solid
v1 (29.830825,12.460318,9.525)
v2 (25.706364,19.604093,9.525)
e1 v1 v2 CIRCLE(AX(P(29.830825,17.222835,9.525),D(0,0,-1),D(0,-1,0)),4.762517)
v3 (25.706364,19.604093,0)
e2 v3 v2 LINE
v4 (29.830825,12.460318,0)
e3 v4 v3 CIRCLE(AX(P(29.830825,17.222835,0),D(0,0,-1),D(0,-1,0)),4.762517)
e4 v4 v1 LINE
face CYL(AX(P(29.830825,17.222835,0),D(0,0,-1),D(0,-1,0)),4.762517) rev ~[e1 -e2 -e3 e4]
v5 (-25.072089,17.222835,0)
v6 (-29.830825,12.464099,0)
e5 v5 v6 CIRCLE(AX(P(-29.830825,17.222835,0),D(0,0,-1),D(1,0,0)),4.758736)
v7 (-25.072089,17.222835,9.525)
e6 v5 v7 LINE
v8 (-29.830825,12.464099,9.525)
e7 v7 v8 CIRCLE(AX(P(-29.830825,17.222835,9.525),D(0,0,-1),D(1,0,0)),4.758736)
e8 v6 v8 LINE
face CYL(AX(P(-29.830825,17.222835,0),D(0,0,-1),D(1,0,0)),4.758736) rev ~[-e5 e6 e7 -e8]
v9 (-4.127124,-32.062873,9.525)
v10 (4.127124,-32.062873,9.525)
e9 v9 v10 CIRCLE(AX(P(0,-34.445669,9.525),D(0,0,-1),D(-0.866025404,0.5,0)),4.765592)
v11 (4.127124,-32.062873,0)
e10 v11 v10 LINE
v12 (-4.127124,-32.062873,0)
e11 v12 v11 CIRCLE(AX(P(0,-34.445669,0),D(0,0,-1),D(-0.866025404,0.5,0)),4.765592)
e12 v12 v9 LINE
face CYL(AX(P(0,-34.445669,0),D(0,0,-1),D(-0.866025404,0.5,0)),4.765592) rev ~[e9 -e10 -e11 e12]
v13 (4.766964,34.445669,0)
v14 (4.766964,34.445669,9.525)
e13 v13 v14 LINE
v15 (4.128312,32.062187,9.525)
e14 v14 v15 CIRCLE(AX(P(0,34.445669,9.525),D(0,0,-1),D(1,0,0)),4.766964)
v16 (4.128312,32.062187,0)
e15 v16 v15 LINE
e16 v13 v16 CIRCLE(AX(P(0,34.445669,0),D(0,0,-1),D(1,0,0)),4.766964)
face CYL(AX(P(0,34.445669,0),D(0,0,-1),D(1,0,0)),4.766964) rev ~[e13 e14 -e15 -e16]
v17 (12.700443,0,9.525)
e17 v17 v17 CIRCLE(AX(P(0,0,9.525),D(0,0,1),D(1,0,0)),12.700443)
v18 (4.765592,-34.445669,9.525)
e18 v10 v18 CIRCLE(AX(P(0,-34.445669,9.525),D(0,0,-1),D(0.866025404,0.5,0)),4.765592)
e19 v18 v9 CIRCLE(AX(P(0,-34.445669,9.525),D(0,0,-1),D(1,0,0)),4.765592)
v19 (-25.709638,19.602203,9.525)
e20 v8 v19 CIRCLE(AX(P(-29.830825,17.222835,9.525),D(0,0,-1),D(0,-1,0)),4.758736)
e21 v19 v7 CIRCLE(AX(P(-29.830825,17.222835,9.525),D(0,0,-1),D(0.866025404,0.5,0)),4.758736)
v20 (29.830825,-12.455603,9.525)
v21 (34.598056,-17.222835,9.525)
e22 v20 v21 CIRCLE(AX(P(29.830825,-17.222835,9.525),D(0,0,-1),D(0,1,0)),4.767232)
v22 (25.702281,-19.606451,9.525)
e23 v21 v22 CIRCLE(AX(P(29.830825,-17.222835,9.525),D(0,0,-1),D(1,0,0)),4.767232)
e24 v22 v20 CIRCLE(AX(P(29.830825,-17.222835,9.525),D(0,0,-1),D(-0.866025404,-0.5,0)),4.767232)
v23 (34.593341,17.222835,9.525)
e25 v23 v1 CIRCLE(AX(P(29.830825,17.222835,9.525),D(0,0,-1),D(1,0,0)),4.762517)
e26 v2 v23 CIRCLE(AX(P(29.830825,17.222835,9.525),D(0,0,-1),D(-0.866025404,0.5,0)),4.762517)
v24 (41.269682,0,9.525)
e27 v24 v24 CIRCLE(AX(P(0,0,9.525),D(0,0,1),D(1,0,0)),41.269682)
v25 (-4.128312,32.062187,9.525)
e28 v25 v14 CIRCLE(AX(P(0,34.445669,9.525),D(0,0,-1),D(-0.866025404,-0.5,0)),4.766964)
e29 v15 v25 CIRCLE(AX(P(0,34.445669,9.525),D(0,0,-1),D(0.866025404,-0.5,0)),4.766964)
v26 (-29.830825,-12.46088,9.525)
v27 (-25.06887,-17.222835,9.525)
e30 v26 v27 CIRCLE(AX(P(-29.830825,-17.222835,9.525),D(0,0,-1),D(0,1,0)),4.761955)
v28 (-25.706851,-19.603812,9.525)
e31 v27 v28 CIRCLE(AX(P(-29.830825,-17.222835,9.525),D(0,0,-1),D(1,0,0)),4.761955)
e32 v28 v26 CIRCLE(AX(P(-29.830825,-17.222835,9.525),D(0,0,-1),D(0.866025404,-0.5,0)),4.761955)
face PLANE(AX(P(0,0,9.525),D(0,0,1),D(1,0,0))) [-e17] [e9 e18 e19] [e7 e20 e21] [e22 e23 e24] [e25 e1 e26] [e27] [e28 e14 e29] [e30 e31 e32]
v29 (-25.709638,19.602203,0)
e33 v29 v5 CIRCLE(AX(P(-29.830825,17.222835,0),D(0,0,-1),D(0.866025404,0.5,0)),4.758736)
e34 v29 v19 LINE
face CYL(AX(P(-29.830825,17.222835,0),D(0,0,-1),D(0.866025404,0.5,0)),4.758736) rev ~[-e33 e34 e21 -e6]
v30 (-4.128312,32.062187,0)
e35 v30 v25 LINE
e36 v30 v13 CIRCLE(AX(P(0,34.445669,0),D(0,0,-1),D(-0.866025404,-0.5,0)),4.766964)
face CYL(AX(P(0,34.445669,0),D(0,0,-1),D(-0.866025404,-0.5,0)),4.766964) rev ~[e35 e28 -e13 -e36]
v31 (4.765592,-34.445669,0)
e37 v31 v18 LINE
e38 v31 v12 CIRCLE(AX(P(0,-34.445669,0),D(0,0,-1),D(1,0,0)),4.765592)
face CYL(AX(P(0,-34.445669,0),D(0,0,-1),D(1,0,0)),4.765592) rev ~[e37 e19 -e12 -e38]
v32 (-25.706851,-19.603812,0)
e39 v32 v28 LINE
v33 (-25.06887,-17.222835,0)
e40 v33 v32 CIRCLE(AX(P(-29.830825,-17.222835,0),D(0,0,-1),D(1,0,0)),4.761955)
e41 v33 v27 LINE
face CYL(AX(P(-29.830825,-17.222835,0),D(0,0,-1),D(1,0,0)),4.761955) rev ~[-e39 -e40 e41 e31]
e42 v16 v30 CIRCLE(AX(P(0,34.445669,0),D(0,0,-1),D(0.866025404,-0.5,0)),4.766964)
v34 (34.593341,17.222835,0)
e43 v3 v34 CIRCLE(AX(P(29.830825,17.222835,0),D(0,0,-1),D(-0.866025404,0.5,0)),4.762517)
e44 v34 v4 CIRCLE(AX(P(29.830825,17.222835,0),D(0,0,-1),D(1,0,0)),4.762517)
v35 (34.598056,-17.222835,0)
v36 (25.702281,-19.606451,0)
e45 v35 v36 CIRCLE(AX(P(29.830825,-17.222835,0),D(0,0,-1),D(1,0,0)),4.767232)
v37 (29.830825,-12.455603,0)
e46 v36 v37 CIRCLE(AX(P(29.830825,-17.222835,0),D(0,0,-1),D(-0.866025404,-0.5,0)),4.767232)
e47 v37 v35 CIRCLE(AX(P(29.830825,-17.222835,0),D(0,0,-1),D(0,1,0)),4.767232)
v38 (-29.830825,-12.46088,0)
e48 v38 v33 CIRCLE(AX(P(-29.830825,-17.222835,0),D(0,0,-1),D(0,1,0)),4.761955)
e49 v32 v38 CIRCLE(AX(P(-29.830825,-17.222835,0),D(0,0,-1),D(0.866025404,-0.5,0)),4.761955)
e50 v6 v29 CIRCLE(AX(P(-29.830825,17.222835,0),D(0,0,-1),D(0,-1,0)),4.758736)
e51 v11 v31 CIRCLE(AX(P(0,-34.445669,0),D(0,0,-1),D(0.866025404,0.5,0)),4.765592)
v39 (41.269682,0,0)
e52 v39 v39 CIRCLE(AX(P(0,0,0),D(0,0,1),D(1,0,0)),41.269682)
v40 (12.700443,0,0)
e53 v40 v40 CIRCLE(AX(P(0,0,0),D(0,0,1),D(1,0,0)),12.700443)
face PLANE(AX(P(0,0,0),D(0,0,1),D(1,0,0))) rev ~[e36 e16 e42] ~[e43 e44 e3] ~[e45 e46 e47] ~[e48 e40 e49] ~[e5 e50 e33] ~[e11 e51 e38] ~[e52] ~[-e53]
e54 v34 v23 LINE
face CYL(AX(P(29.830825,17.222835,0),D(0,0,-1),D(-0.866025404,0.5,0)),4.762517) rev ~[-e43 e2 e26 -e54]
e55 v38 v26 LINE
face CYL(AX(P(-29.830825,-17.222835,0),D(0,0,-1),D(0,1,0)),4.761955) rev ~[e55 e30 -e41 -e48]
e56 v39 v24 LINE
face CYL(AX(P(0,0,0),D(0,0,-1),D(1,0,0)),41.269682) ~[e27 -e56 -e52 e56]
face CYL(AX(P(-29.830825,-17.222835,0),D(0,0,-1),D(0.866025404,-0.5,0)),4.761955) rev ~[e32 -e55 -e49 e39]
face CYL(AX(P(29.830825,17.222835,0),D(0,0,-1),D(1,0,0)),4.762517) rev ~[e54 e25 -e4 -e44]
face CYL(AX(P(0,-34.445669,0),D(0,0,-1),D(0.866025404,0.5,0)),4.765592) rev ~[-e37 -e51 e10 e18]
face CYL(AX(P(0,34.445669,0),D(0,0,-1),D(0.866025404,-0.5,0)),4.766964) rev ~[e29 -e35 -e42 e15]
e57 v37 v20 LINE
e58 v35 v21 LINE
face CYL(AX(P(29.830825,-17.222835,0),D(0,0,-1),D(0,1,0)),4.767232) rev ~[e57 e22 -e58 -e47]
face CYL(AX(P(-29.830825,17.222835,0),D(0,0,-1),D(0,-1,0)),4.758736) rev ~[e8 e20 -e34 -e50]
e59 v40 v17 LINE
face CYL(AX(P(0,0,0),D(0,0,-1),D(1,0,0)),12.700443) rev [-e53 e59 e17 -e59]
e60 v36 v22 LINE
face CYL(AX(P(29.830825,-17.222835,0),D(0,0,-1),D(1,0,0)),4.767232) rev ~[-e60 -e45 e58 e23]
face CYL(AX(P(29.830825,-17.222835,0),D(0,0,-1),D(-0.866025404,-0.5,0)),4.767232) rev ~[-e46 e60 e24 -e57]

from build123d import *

# Parameters (mm, degrees)
F0_R     = 41.2696821878
F0_R_2   = 12.7004431624
F1_DEPTH = 9.525


# Not quite as in the source:
# - a feature names something its author has since deleted; it is built from what else it names


with BuildPart() as f1:
    # F0 (on Top) → F1 (new body)
    with BuildSketch(Plane.XY):
        Circle(F0_R)
        with BuildLine():
            ThreePointArc((34.593341478, 17.2228345975), (33.1984325721, 13.8552265986), (29.8308245732, 12.4603176927))
            Line((29.8308245732, 12.4603176927), (29.8308245732, -12.4556027445))
            ThreePointArc((29.8308245732, -12.4556027445), (33.201766544, -13.8518926268), (34.5980564262, -17.2228345975))
            ThreePointArc((34.5980564262, -17.2228345975), (31.0646749692, -21.8276269642), (25.7022806828, -19.606450524))
            Line((25.7022806828, -19.606450524), (4.1271236512, -32.062873244))
            ThreePointArc((4.1271236512, -32.062873244), (4.6032082956, -33.2122432496), (4.7655919019, -34.445669195))
            ThreePointArc((4.7655919019, -34.445669195), (-1.2334259454, -39.0488774906), (-4.1271236512, -32.062873244))
            Line((-4.1271236512, -32.062873244), (-25.7068508494, -19.6038119371))
            ThreePointArc((-25.7068508494, -19.6038119371), (-33.9547982971, -19.6038119371), (-29.8308245732, -12.4608799183))
            Line((-29.8308245732, -12.4608799183), (-29.8308245732, 12.464098707))
            ThreePointArc((-29.8308245732, 12.464098707), (-33.9520107443, 19.6022025428), (-25.7096384021, 19.6022025428))
            Line((-25.7096384021, 19.6022025428), (-4.1283119696, 32.062187168))
            ThreePointArc((-4.1283119696, 32.062187168), (-1.2337810845, 39.0502028877), (4.766964054, 34.445669195))
            ThreePointArc((4.766964054, 34.445669195), (4.6045336927, 33.2118881105), (4.1283119696, 32.062187168))
            Line((4.1283119696, 32.062187168), (25.7063639477, 19.6040930499))
            ThreePointArc((25.7063639477, 19.6040930499), (31.0634546508, 21.823072674), (34.593341478, 17.2228345975))
        make_face(mode=Mode.SUBTRACT)
        with BuildLine():
            Line((29.8308245732, -12.4556027445), (29.8308245732, 12.4603176927))
            ThreePointArc((29.8308245732, 12.4603176927), (25.7063639477, 14.8415761451), (25.7063639477, 19.6040930499))
            Line((25.7063639477, 19.6040930499), (4.1283119696, 32.062187168))
            ThreePointArc((4.1283119696, 32.062187168), (0, 29.6787051411), (-4.1283119696, 32.062187168))
            Line((-4.1283119696, 32.062187168), (-25.7096384021, 19.6022025428))
            ThreePointArc((-25.7096384021, 19.6022025428), (-25.2342386761, 18.4544860766), (-25.0720886827, 17.2228345975))
            ThreePointArc((-25.0720886827, 17.2228345975), (-26.4658901552, 13.8579001794), (-29.8308245732, 12.464098707))
            Line((-29.8308245732, 12.464098707), (-29.8308245732, -12.4608799183))
            ThreePointArc((-29.8308245732, -12.4608799183), (-26.4636141278, -13.8556241521), (-25.068869894, -17.2228345975))
            ThreePointArc((-25.068869894, -17.2228345975), (-25.231129565, -18.4553191604), (-25.7068508494, -19.6038119371))
            Line((-25.7068508494, -19.6038119371), (-4.1271236512, -32.062873244))
            ThreePointArc((-4.1271236512, -32.062873244), (0, -29.6800772931), (4.1271236512, -32.062873244))
            Line((4.1271236512, -32.062873244), (25.7022806828, -19.606450524))
            ThreePointArc((25.7022806828, -19.606450524), (25.7022806828, -14.839218671), (29.8308245732, -12.4556027445))
        make_face()
        Circle(F0_R_2, mode=Mode.SUBTRACT)
    extrude(amount=F1_DEPTH)


solid = f1.part
